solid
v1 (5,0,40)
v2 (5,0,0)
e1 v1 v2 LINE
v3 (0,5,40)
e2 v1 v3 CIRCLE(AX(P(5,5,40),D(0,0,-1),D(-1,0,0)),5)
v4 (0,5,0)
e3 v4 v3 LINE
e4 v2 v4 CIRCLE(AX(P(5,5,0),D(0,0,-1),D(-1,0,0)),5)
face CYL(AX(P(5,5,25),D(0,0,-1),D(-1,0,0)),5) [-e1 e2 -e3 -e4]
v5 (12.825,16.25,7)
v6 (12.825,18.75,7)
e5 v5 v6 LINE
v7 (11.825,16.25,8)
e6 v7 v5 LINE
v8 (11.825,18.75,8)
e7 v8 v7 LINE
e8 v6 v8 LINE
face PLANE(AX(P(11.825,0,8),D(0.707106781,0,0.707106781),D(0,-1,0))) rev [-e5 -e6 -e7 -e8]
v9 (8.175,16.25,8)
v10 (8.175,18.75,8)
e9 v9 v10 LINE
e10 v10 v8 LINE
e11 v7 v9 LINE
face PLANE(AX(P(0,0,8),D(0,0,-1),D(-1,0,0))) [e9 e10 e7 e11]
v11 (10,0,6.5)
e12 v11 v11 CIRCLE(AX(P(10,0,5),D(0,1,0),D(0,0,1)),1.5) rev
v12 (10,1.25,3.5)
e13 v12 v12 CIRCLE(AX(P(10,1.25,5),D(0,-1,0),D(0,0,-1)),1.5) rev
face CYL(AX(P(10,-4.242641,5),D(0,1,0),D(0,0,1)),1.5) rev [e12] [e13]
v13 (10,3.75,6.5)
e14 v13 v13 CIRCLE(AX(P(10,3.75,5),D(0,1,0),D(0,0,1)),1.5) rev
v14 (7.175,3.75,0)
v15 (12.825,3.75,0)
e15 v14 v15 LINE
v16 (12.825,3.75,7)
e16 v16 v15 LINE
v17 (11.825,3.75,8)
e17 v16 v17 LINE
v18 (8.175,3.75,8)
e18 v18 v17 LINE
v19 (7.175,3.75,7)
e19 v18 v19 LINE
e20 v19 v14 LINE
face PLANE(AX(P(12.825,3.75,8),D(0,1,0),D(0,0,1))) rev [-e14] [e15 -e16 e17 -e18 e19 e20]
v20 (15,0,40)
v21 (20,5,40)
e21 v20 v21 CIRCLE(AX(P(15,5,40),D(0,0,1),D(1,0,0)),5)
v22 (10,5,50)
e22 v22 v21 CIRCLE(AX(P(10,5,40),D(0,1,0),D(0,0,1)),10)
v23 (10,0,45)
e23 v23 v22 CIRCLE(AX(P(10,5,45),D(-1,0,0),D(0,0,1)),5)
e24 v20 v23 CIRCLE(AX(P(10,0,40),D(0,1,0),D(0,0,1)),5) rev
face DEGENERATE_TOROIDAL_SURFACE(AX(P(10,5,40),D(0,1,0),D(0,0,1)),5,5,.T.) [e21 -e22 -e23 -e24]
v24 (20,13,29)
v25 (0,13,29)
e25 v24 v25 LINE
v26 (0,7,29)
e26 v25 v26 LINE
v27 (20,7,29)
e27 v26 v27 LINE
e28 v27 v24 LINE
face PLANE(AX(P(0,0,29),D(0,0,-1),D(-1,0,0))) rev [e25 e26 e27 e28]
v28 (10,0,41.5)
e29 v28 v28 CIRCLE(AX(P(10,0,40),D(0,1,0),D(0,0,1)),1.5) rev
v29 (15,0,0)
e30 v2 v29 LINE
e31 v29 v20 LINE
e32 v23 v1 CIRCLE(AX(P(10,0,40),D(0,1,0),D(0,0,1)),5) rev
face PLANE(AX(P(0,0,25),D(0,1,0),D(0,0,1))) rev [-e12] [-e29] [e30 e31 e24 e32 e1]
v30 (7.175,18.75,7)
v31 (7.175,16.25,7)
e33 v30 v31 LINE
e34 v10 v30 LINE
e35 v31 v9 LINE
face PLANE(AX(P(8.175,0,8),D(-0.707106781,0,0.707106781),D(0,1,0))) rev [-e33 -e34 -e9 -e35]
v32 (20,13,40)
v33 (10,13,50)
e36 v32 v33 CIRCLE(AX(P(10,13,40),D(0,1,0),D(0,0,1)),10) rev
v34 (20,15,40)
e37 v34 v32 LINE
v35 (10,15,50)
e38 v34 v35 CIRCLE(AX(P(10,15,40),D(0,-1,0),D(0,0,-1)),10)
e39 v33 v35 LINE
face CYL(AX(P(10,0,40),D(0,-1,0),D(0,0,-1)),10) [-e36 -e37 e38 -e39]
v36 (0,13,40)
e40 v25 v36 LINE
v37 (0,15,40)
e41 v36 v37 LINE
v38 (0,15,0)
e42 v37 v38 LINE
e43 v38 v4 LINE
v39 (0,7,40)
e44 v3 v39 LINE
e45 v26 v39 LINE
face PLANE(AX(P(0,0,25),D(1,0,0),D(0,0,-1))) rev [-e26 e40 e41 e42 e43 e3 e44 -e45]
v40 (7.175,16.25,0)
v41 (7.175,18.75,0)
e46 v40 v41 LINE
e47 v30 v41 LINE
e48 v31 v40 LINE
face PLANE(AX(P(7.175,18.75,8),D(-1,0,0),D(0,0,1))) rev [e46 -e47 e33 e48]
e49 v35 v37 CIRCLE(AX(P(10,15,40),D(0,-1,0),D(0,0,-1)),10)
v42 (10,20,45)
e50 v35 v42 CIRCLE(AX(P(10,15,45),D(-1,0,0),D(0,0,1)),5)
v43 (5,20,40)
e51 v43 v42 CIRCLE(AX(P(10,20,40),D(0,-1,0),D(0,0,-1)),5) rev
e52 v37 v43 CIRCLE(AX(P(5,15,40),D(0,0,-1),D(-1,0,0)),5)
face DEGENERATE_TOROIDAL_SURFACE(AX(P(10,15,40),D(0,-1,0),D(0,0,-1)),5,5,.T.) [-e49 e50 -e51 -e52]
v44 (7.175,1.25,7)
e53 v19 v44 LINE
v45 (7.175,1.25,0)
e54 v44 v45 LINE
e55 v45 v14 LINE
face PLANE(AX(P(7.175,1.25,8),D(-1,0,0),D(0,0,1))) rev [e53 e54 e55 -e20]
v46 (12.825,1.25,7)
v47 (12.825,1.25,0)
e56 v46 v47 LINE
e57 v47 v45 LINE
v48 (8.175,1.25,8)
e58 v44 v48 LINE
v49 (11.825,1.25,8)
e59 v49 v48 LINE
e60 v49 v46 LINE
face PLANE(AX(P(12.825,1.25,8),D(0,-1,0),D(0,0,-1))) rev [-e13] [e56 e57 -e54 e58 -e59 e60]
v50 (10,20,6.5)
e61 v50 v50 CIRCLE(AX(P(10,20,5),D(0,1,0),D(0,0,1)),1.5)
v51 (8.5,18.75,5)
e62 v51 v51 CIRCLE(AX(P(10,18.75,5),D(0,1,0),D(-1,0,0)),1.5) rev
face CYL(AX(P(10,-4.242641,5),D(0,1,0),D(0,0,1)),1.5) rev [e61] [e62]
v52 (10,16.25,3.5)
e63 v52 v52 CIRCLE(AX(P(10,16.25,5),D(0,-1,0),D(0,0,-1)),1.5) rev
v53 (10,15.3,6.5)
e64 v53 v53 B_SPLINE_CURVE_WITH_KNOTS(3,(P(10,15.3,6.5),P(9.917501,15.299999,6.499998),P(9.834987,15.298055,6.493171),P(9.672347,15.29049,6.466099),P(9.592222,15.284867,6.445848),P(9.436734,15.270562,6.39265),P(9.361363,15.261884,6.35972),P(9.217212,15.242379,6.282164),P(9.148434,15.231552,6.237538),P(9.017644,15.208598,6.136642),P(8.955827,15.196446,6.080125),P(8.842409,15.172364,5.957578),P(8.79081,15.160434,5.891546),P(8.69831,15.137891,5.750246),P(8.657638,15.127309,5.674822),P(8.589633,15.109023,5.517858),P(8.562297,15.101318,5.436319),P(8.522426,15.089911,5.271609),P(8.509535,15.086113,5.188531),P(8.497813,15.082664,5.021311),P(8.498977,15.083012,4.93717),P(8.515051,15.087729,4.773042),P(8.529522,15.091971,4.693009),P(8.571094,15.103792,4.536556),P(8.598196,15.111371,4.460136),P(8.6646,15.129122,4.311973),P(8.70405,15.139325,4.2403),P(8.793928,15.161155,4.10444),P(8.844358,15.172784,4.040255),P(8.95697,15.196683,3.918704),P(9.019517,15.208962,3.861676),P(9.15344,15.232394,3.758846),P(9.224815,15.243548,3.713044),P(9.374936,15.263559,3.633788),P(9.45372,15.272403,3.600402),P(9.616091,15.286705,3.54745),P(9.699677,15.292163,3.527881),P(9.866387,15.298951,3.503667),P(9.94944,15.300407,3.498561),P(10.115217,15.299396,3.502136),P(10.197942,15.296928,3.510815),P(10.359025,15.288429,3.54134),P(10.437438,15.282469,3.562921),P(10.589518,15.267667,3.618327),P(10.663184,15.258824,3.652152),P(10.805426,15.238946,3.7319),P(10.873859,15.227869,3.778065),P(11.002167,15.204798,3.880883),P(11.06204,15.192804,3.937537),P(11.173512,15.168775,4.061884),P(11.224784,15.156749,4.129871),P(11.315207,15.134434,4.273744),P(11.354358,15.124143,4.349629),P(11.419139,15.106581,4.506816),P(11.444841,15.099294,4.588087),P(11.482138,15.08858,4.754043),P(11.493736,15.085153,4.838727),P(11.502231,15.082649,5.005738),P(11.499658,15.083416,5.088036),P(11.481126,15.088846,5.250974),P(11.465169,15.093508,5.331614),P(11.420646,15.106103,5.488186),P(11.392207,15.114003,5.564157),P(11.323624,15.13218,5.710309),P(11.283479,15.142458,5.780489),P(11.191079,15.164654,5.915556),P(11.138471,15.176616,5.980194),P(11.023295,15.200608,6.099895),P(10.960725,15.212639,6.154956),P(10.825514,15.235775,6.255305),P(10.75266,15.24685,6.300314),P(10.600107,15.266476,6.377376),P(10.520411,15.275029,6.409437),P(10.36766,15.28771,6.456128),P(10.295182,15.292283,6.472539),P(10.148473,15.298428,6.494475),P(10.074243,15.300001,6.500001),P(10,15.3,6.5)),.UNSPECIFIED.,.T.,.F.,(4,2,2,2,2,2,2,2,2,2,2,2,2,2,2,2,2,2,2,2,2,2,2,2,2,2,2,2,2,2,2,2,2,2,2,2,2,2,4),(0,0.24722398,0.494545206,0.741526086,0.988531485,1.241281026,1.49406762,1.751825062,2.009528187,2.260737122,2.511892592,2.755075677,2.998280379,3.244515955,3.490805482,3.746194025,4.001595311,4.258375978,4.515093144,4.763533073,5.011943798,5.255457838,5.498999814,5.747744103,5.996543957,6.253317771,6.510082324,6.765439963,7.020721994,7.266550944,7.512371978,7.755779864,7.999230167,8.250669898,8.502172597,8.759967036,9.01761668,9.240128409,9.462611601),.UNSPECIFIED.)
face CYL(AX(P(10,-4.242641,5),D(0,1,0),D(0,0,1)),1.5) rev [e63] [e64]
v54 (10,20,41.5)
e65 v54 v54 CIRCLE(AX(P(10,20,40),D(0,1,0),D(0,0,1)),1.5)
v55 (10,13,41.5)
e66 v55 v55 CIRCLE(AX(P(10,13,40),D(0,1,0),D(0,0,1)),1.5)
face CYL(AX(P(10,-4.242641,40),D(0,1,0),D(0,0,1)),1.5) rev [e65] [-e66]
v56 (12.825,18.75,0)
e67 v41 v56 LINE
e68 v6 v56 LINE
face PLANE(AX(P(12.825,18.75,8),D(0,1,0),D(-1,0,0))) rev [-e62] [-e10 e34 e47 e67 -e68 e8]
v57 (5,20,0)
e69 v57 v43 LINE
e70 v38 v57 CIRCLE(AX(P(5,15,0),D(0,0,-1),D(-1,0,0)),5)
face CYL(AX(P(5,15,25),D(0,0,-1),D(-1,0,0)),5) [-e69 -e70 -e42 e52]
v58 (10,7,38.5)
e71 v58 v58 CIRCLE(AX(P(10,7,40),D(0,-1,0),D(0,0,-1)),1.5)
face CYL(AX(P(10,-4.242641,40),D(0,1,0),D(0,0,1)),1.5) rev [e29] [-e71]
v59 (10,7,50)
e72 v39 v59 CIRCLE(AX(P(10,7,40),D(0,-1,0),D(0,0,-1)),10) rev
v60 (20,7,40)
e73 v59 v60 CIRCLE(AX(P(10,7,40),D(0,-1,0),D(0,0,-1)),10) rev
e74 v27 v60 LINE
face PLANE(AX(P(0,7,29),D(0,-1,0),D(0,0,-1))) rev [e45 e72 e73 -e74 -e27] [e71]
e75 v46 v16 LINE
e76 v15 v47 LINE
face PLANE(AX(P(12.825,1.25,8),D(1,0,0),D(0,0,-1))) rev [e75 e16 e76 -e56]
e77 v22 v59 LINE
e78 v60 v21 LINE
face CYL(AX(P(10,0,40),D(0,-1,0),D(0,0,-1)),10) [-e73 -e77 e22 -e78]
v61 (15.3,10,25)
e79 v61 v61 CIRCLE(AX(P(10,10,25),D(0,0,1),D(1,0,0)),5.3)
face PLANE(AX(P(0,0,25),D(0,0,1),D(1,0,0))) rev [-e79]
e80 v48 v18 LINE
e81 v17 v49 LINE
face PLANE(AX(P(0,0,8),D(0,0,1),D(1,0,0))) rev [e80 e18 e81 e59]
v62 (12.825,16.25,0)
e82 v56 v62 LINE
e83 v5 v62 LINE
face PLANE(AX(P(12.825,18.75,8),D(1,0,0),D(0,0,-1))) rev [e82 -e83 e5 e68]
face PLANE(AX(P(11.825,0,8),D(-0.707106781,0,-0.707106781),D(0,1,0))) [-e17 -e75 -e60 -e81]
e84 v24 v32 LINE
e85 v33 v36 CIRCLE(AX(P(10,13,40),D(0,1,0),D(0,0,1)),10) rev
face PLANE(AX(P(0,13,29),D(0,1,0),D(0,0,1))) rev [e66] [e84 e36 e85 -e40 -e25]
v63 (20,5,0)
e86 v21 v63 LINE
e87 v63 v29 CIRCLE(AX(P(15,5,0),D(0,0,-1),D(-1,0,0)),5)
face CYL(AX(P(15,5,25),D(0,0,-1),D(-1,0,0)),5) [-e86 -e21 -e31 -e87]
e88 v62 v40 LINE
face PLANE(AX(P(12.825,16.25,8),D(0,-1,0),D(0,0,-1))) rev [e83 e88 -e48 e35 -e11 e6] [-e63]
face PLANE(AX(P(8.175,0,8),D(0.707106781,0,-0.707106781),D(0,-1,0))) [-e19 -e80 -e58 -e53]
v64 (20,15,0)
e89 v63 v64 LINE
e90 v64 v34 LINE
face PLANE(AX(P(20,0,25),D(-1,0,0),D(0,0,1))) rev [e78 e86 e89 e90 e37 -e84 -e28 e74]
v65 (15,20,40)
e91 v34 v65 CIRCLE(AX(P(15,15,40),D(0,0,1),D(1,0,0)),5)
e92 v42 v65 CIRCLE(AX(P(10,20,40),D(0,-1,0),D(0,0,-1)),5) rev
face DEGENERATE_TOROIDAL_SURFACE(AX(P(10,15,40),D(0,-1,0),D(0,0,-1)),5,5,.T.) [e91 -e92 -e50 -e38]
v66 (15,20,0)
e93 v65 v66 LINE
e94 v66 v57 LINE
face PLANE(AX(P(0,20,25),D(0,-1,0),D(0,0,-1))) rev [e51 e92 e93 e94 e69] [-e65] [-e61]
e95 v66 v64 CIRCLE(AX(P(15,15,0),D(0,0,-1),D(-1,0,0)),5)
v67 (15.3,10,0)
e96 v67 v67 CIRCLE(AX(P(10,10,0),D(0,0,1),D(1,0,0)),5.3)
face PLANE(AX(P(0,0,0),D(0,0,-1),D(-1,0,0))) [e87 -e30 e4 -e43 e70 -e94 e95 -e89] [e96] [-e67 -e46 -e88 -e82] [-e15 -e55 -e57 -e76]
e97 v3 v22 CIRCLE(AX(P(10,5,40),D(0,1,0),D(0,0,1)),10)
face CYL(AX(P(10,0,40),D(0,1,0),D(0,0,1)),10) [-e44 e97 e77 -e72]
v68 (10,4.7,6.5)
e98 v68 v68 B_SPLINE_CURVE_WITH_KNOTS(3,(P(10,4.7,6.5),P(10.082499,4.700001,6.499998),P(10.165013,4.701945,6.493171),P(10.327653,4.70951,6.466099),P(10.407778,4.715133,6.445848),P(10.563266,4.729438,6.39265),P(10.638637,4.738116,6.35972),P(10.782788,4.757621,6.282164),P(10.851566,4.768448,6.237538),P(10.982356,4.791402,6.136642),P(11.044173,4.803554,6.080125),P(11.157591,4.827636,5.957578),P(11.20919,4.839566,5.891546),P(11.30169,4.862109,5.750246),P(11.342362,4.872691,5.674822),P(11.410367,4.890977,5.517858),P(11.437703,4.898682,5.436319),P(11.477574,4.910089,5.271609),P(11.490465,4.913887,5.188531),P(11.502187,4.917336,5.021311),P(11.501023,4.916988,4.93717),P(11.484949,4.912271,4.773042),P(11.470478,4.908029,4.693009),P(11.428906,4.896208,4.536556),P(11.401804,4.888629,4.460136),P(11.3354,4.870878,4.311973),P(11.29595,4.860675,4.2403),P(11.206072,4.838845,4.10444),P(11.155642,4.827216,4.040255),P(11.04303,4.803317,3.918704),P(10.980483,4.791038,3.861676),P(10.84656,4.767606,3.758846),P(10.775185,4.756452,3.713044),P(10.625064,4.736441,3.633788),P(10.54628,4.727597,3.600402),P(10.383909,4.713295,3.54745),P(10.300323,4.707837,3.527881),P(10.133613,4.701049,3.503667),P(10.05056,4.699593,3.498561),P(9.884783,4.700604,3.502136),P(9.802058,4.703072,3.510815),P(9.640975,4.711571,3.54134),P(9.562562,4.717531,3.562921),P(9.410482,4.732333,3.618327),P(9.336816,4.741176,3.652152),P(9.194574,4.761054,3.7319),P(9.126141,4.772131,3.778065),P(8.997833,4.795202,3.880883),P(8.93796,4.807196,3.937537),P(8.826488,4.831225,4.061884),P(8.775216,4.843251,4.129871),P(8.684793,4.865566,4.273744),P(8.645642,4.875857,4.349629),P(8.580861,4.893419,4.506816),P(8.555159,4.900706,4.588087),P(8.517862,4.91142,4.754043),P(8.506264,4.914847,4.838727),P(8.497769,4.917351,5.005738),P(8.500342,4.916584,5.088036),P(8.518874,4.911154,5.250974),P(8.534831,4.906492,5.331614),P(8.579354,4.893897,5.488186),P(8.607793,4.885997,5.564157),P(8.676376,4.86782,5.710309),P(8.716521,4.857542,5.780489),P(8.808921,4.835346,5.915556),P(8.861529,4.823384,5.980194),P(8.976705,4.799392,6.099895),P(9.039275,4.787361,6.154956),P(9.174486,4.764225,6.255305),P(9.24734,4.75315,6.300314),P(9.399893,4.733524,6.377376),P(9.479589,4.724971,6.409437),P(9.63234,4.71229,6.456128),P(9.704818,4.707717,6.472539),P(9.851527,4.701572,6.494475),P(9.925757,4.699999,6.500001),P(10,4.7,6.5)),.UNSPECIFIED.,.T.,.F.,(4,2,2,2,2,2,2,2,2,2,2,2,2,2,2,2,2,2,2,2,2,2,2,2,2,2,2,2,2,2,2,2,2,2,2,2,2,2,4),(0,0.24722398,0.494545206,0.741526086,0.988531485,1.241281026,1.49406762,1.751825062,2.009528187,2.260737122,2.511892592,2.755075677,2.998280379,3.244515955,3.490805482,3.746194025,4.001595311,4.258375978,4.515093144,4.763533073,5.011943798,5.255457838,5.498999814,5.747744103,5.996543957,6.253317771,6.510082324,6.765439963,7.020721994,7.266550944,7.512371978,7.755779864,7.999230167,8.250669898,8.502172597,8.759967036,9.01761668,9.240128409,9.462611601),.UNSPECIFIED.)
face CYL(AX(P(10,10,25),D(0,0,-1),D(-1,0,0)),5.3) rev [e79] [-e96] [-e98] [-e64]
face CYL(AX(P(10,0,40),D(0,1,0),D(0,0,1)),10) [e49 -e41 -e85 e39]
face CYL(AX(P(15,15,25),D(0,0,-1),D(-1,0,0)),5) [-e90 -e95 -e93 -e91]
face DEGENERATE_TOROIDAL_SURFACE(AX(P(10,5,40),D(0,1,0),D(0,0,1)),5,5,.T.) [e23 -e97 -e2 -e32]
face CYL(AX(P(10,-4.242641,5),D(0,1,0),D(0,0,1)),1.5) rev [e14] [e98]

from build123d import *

# Parameters (mm, degrees)
SKETCH1_W           = 20
SKETCH1_H           = 20
SKETCH1_R           = 5.3
BOSS_EXTRUDE1_DEPTH = 25
SKETCH2_W           = 20
SKETCH2_H           = 20
BOSS_EXTRUDE2_DEPTH = 25
SKETCH4_W           = 20
SKETCH4_H           = 6
CUT_EXTRUDE1_DEPTH  = 21
CUT_EXTRUDE2_REACH  = 59.446
SKETCH5_R           = 1.5
FILLET2_R           = 10
FILLET3_R           = 5
SKETCH6_W           = 5.65
SKETCH6_H           = 2.5
CUT_EXTRUDE3_DEPTH  = 8
CHAMFER1_SIZE       = 1


with BuildPart() as part:
    # Sketch1 → Boss-Extrude1 (new body)
    with BuildSketch(Plane.XY):
        with Locations((10, 10)):
            Rectangle(SKETCH1_W, SKETCH1_H)
        with Locations((10, 10)):
            Circle(SKETCH1_R, mode=Mode.SUBTRACT)
    extrude(amount=BOSS_EXTRUDE1_DEPTH)

    # Sketch2 → Boss-Extrude2 (add)
    with BuildSketch(Plane.XY.offset(25)):
        with Locations((10, 10)):
            Rectangle(SKETCH2_W, SKETCH2_H)
    extrude(amount=BOSS_EXTRUDE2_DEPTH)

    # Sketch4 → Cut-Extrude1 (cut)
    with BuildSketch(Plane.XY.offset(50)):
        with Locations((10, 10)):
            Rectangle(SKETCH4_W, SKETCH4_H)
    extrude(amount=-CUT_EXTRUDE1_DEPTH, mode=Mode.SUBTRACT)

    # Cut-Extrude2: up to this face of the body (flat: up to its plane)
    cut_extrude2_end = Plane(part.part.faces().sort_by_distance((10, 0, 25))[0])
    # Sketch5 → Cut-Extrude2 (cut, up to the picked face)
    with BuildSketch(Plane(origin=(0, 20, 0), x_dir=(1, 0, 0), z_dir=(0, 1, 0)), mode=Mode.PRIVATE) as cut_extrude2_sk1:
        with Locations(Location((10, -5, 0), (0, 0, 270))):
            Circle(SKETCH5_R)
    cut_extrude2_tool1 = split(extrude(cut_extrude2_sk1.sketch, amount=-CUT_EXTRUDE2_REACH, mode=Mode.PRIVATE), bisect_by=cut_extrude2_end, keep=Keep.BOTH, mode=Mode.PRIVATE)
    # Sketch5 → Cut-Extrude2 (cut, up to the picked face)
    with BuildSketch(Plane(origin=(0, 20, 0), x_dir=(1, 0, 0), z_dir=(0, 1, 0)), mode=Mode.PRIVATE) as cut_extrude2_sk2:
        with Locations(Location((10, -40, 0), (0, 0, 270))):
            Circle(SKETCH5_R)
    cut_extrude2_tool2 = split(extrude(cut_extrude2_sk2.sketch, amount=-CUT_EXTRUDE2_REACH, mode=Mode.PRIVATE), bisect_by=cut_extrude2_end, keep=Keep.BOTH, mode=Mode.PRIVATE)
    add(cut_extrude2_tool1.solids().sort_by(Axis((10, 20, 5), (0, -1, 0)))[0], mode=Mode.SUBTRACT)
    add(cut_extrude2_tool2.solids().sort_by(Axis((10, 20, 40), (0, -1, 0)))[0], mode=Mode.SUBTRACT)

    # Fillet2
    fillet2_edges = [part.edges().sort_by_distance(p)[0] for p in [
        (0, 16.5, 50),
        (0, 3.5, 50),
        (20, 3.5, 50),
        (20, 16.5, 50),
    ]]
    fillet(fillet2_edges, radius=FILLET2_R - 0.0001)  # a hair under: the kernel refuses the full size

    # Fillet3
    fillet3_edges = [part.edges().sort_by_distance(p)[0] for p in [
        (0, 20, 20.00005),
        (0, 0, 20.00005),
        (20, 20, 20.00005),
        (17.071097101, 20, 47.071097101),
        (2.928902899, 20, 47.071097101),
        (20, 0, 20.00005),
        (17.071097101, 0, 47.071097101),
        (2.928902899, 0, 47.071097101),
    ]]
    fillet(fillet3_edges, radius=FILLET3_R)

    # Sketch6 → Cut-Extrude3 (cut)
    with BuildSketch(Plane(origin=(0, 0, 0), x_dir=(-1, 0, 0), z_dir=(0, 0, -1))):
        with Locations((-10, 17.5)):
            Rectangle(SKETCH6_W, SKETCH6_H)
        with Locations((-10, 2.5)):
            Rectangle(SKETCH6_W, SKETCH6_H)
    extrude(amount=-CUT_EXTRUDE3_DEPTH, mode=Mode.SUBTRACT)

    # Chamfer1
    chamfer1_edges = [part.edges().sort_by_distance(p)[0] for p in [
        (12.825, 17.5, 8),
        (7.175, 17.5, 8),
        (12.825, 2.5, 8),
        (7.175, 2.5, 8),
    ]]
    chamfer(chamfer1_edges, length=CHAMFER1_SIZE)


solid = part.part
